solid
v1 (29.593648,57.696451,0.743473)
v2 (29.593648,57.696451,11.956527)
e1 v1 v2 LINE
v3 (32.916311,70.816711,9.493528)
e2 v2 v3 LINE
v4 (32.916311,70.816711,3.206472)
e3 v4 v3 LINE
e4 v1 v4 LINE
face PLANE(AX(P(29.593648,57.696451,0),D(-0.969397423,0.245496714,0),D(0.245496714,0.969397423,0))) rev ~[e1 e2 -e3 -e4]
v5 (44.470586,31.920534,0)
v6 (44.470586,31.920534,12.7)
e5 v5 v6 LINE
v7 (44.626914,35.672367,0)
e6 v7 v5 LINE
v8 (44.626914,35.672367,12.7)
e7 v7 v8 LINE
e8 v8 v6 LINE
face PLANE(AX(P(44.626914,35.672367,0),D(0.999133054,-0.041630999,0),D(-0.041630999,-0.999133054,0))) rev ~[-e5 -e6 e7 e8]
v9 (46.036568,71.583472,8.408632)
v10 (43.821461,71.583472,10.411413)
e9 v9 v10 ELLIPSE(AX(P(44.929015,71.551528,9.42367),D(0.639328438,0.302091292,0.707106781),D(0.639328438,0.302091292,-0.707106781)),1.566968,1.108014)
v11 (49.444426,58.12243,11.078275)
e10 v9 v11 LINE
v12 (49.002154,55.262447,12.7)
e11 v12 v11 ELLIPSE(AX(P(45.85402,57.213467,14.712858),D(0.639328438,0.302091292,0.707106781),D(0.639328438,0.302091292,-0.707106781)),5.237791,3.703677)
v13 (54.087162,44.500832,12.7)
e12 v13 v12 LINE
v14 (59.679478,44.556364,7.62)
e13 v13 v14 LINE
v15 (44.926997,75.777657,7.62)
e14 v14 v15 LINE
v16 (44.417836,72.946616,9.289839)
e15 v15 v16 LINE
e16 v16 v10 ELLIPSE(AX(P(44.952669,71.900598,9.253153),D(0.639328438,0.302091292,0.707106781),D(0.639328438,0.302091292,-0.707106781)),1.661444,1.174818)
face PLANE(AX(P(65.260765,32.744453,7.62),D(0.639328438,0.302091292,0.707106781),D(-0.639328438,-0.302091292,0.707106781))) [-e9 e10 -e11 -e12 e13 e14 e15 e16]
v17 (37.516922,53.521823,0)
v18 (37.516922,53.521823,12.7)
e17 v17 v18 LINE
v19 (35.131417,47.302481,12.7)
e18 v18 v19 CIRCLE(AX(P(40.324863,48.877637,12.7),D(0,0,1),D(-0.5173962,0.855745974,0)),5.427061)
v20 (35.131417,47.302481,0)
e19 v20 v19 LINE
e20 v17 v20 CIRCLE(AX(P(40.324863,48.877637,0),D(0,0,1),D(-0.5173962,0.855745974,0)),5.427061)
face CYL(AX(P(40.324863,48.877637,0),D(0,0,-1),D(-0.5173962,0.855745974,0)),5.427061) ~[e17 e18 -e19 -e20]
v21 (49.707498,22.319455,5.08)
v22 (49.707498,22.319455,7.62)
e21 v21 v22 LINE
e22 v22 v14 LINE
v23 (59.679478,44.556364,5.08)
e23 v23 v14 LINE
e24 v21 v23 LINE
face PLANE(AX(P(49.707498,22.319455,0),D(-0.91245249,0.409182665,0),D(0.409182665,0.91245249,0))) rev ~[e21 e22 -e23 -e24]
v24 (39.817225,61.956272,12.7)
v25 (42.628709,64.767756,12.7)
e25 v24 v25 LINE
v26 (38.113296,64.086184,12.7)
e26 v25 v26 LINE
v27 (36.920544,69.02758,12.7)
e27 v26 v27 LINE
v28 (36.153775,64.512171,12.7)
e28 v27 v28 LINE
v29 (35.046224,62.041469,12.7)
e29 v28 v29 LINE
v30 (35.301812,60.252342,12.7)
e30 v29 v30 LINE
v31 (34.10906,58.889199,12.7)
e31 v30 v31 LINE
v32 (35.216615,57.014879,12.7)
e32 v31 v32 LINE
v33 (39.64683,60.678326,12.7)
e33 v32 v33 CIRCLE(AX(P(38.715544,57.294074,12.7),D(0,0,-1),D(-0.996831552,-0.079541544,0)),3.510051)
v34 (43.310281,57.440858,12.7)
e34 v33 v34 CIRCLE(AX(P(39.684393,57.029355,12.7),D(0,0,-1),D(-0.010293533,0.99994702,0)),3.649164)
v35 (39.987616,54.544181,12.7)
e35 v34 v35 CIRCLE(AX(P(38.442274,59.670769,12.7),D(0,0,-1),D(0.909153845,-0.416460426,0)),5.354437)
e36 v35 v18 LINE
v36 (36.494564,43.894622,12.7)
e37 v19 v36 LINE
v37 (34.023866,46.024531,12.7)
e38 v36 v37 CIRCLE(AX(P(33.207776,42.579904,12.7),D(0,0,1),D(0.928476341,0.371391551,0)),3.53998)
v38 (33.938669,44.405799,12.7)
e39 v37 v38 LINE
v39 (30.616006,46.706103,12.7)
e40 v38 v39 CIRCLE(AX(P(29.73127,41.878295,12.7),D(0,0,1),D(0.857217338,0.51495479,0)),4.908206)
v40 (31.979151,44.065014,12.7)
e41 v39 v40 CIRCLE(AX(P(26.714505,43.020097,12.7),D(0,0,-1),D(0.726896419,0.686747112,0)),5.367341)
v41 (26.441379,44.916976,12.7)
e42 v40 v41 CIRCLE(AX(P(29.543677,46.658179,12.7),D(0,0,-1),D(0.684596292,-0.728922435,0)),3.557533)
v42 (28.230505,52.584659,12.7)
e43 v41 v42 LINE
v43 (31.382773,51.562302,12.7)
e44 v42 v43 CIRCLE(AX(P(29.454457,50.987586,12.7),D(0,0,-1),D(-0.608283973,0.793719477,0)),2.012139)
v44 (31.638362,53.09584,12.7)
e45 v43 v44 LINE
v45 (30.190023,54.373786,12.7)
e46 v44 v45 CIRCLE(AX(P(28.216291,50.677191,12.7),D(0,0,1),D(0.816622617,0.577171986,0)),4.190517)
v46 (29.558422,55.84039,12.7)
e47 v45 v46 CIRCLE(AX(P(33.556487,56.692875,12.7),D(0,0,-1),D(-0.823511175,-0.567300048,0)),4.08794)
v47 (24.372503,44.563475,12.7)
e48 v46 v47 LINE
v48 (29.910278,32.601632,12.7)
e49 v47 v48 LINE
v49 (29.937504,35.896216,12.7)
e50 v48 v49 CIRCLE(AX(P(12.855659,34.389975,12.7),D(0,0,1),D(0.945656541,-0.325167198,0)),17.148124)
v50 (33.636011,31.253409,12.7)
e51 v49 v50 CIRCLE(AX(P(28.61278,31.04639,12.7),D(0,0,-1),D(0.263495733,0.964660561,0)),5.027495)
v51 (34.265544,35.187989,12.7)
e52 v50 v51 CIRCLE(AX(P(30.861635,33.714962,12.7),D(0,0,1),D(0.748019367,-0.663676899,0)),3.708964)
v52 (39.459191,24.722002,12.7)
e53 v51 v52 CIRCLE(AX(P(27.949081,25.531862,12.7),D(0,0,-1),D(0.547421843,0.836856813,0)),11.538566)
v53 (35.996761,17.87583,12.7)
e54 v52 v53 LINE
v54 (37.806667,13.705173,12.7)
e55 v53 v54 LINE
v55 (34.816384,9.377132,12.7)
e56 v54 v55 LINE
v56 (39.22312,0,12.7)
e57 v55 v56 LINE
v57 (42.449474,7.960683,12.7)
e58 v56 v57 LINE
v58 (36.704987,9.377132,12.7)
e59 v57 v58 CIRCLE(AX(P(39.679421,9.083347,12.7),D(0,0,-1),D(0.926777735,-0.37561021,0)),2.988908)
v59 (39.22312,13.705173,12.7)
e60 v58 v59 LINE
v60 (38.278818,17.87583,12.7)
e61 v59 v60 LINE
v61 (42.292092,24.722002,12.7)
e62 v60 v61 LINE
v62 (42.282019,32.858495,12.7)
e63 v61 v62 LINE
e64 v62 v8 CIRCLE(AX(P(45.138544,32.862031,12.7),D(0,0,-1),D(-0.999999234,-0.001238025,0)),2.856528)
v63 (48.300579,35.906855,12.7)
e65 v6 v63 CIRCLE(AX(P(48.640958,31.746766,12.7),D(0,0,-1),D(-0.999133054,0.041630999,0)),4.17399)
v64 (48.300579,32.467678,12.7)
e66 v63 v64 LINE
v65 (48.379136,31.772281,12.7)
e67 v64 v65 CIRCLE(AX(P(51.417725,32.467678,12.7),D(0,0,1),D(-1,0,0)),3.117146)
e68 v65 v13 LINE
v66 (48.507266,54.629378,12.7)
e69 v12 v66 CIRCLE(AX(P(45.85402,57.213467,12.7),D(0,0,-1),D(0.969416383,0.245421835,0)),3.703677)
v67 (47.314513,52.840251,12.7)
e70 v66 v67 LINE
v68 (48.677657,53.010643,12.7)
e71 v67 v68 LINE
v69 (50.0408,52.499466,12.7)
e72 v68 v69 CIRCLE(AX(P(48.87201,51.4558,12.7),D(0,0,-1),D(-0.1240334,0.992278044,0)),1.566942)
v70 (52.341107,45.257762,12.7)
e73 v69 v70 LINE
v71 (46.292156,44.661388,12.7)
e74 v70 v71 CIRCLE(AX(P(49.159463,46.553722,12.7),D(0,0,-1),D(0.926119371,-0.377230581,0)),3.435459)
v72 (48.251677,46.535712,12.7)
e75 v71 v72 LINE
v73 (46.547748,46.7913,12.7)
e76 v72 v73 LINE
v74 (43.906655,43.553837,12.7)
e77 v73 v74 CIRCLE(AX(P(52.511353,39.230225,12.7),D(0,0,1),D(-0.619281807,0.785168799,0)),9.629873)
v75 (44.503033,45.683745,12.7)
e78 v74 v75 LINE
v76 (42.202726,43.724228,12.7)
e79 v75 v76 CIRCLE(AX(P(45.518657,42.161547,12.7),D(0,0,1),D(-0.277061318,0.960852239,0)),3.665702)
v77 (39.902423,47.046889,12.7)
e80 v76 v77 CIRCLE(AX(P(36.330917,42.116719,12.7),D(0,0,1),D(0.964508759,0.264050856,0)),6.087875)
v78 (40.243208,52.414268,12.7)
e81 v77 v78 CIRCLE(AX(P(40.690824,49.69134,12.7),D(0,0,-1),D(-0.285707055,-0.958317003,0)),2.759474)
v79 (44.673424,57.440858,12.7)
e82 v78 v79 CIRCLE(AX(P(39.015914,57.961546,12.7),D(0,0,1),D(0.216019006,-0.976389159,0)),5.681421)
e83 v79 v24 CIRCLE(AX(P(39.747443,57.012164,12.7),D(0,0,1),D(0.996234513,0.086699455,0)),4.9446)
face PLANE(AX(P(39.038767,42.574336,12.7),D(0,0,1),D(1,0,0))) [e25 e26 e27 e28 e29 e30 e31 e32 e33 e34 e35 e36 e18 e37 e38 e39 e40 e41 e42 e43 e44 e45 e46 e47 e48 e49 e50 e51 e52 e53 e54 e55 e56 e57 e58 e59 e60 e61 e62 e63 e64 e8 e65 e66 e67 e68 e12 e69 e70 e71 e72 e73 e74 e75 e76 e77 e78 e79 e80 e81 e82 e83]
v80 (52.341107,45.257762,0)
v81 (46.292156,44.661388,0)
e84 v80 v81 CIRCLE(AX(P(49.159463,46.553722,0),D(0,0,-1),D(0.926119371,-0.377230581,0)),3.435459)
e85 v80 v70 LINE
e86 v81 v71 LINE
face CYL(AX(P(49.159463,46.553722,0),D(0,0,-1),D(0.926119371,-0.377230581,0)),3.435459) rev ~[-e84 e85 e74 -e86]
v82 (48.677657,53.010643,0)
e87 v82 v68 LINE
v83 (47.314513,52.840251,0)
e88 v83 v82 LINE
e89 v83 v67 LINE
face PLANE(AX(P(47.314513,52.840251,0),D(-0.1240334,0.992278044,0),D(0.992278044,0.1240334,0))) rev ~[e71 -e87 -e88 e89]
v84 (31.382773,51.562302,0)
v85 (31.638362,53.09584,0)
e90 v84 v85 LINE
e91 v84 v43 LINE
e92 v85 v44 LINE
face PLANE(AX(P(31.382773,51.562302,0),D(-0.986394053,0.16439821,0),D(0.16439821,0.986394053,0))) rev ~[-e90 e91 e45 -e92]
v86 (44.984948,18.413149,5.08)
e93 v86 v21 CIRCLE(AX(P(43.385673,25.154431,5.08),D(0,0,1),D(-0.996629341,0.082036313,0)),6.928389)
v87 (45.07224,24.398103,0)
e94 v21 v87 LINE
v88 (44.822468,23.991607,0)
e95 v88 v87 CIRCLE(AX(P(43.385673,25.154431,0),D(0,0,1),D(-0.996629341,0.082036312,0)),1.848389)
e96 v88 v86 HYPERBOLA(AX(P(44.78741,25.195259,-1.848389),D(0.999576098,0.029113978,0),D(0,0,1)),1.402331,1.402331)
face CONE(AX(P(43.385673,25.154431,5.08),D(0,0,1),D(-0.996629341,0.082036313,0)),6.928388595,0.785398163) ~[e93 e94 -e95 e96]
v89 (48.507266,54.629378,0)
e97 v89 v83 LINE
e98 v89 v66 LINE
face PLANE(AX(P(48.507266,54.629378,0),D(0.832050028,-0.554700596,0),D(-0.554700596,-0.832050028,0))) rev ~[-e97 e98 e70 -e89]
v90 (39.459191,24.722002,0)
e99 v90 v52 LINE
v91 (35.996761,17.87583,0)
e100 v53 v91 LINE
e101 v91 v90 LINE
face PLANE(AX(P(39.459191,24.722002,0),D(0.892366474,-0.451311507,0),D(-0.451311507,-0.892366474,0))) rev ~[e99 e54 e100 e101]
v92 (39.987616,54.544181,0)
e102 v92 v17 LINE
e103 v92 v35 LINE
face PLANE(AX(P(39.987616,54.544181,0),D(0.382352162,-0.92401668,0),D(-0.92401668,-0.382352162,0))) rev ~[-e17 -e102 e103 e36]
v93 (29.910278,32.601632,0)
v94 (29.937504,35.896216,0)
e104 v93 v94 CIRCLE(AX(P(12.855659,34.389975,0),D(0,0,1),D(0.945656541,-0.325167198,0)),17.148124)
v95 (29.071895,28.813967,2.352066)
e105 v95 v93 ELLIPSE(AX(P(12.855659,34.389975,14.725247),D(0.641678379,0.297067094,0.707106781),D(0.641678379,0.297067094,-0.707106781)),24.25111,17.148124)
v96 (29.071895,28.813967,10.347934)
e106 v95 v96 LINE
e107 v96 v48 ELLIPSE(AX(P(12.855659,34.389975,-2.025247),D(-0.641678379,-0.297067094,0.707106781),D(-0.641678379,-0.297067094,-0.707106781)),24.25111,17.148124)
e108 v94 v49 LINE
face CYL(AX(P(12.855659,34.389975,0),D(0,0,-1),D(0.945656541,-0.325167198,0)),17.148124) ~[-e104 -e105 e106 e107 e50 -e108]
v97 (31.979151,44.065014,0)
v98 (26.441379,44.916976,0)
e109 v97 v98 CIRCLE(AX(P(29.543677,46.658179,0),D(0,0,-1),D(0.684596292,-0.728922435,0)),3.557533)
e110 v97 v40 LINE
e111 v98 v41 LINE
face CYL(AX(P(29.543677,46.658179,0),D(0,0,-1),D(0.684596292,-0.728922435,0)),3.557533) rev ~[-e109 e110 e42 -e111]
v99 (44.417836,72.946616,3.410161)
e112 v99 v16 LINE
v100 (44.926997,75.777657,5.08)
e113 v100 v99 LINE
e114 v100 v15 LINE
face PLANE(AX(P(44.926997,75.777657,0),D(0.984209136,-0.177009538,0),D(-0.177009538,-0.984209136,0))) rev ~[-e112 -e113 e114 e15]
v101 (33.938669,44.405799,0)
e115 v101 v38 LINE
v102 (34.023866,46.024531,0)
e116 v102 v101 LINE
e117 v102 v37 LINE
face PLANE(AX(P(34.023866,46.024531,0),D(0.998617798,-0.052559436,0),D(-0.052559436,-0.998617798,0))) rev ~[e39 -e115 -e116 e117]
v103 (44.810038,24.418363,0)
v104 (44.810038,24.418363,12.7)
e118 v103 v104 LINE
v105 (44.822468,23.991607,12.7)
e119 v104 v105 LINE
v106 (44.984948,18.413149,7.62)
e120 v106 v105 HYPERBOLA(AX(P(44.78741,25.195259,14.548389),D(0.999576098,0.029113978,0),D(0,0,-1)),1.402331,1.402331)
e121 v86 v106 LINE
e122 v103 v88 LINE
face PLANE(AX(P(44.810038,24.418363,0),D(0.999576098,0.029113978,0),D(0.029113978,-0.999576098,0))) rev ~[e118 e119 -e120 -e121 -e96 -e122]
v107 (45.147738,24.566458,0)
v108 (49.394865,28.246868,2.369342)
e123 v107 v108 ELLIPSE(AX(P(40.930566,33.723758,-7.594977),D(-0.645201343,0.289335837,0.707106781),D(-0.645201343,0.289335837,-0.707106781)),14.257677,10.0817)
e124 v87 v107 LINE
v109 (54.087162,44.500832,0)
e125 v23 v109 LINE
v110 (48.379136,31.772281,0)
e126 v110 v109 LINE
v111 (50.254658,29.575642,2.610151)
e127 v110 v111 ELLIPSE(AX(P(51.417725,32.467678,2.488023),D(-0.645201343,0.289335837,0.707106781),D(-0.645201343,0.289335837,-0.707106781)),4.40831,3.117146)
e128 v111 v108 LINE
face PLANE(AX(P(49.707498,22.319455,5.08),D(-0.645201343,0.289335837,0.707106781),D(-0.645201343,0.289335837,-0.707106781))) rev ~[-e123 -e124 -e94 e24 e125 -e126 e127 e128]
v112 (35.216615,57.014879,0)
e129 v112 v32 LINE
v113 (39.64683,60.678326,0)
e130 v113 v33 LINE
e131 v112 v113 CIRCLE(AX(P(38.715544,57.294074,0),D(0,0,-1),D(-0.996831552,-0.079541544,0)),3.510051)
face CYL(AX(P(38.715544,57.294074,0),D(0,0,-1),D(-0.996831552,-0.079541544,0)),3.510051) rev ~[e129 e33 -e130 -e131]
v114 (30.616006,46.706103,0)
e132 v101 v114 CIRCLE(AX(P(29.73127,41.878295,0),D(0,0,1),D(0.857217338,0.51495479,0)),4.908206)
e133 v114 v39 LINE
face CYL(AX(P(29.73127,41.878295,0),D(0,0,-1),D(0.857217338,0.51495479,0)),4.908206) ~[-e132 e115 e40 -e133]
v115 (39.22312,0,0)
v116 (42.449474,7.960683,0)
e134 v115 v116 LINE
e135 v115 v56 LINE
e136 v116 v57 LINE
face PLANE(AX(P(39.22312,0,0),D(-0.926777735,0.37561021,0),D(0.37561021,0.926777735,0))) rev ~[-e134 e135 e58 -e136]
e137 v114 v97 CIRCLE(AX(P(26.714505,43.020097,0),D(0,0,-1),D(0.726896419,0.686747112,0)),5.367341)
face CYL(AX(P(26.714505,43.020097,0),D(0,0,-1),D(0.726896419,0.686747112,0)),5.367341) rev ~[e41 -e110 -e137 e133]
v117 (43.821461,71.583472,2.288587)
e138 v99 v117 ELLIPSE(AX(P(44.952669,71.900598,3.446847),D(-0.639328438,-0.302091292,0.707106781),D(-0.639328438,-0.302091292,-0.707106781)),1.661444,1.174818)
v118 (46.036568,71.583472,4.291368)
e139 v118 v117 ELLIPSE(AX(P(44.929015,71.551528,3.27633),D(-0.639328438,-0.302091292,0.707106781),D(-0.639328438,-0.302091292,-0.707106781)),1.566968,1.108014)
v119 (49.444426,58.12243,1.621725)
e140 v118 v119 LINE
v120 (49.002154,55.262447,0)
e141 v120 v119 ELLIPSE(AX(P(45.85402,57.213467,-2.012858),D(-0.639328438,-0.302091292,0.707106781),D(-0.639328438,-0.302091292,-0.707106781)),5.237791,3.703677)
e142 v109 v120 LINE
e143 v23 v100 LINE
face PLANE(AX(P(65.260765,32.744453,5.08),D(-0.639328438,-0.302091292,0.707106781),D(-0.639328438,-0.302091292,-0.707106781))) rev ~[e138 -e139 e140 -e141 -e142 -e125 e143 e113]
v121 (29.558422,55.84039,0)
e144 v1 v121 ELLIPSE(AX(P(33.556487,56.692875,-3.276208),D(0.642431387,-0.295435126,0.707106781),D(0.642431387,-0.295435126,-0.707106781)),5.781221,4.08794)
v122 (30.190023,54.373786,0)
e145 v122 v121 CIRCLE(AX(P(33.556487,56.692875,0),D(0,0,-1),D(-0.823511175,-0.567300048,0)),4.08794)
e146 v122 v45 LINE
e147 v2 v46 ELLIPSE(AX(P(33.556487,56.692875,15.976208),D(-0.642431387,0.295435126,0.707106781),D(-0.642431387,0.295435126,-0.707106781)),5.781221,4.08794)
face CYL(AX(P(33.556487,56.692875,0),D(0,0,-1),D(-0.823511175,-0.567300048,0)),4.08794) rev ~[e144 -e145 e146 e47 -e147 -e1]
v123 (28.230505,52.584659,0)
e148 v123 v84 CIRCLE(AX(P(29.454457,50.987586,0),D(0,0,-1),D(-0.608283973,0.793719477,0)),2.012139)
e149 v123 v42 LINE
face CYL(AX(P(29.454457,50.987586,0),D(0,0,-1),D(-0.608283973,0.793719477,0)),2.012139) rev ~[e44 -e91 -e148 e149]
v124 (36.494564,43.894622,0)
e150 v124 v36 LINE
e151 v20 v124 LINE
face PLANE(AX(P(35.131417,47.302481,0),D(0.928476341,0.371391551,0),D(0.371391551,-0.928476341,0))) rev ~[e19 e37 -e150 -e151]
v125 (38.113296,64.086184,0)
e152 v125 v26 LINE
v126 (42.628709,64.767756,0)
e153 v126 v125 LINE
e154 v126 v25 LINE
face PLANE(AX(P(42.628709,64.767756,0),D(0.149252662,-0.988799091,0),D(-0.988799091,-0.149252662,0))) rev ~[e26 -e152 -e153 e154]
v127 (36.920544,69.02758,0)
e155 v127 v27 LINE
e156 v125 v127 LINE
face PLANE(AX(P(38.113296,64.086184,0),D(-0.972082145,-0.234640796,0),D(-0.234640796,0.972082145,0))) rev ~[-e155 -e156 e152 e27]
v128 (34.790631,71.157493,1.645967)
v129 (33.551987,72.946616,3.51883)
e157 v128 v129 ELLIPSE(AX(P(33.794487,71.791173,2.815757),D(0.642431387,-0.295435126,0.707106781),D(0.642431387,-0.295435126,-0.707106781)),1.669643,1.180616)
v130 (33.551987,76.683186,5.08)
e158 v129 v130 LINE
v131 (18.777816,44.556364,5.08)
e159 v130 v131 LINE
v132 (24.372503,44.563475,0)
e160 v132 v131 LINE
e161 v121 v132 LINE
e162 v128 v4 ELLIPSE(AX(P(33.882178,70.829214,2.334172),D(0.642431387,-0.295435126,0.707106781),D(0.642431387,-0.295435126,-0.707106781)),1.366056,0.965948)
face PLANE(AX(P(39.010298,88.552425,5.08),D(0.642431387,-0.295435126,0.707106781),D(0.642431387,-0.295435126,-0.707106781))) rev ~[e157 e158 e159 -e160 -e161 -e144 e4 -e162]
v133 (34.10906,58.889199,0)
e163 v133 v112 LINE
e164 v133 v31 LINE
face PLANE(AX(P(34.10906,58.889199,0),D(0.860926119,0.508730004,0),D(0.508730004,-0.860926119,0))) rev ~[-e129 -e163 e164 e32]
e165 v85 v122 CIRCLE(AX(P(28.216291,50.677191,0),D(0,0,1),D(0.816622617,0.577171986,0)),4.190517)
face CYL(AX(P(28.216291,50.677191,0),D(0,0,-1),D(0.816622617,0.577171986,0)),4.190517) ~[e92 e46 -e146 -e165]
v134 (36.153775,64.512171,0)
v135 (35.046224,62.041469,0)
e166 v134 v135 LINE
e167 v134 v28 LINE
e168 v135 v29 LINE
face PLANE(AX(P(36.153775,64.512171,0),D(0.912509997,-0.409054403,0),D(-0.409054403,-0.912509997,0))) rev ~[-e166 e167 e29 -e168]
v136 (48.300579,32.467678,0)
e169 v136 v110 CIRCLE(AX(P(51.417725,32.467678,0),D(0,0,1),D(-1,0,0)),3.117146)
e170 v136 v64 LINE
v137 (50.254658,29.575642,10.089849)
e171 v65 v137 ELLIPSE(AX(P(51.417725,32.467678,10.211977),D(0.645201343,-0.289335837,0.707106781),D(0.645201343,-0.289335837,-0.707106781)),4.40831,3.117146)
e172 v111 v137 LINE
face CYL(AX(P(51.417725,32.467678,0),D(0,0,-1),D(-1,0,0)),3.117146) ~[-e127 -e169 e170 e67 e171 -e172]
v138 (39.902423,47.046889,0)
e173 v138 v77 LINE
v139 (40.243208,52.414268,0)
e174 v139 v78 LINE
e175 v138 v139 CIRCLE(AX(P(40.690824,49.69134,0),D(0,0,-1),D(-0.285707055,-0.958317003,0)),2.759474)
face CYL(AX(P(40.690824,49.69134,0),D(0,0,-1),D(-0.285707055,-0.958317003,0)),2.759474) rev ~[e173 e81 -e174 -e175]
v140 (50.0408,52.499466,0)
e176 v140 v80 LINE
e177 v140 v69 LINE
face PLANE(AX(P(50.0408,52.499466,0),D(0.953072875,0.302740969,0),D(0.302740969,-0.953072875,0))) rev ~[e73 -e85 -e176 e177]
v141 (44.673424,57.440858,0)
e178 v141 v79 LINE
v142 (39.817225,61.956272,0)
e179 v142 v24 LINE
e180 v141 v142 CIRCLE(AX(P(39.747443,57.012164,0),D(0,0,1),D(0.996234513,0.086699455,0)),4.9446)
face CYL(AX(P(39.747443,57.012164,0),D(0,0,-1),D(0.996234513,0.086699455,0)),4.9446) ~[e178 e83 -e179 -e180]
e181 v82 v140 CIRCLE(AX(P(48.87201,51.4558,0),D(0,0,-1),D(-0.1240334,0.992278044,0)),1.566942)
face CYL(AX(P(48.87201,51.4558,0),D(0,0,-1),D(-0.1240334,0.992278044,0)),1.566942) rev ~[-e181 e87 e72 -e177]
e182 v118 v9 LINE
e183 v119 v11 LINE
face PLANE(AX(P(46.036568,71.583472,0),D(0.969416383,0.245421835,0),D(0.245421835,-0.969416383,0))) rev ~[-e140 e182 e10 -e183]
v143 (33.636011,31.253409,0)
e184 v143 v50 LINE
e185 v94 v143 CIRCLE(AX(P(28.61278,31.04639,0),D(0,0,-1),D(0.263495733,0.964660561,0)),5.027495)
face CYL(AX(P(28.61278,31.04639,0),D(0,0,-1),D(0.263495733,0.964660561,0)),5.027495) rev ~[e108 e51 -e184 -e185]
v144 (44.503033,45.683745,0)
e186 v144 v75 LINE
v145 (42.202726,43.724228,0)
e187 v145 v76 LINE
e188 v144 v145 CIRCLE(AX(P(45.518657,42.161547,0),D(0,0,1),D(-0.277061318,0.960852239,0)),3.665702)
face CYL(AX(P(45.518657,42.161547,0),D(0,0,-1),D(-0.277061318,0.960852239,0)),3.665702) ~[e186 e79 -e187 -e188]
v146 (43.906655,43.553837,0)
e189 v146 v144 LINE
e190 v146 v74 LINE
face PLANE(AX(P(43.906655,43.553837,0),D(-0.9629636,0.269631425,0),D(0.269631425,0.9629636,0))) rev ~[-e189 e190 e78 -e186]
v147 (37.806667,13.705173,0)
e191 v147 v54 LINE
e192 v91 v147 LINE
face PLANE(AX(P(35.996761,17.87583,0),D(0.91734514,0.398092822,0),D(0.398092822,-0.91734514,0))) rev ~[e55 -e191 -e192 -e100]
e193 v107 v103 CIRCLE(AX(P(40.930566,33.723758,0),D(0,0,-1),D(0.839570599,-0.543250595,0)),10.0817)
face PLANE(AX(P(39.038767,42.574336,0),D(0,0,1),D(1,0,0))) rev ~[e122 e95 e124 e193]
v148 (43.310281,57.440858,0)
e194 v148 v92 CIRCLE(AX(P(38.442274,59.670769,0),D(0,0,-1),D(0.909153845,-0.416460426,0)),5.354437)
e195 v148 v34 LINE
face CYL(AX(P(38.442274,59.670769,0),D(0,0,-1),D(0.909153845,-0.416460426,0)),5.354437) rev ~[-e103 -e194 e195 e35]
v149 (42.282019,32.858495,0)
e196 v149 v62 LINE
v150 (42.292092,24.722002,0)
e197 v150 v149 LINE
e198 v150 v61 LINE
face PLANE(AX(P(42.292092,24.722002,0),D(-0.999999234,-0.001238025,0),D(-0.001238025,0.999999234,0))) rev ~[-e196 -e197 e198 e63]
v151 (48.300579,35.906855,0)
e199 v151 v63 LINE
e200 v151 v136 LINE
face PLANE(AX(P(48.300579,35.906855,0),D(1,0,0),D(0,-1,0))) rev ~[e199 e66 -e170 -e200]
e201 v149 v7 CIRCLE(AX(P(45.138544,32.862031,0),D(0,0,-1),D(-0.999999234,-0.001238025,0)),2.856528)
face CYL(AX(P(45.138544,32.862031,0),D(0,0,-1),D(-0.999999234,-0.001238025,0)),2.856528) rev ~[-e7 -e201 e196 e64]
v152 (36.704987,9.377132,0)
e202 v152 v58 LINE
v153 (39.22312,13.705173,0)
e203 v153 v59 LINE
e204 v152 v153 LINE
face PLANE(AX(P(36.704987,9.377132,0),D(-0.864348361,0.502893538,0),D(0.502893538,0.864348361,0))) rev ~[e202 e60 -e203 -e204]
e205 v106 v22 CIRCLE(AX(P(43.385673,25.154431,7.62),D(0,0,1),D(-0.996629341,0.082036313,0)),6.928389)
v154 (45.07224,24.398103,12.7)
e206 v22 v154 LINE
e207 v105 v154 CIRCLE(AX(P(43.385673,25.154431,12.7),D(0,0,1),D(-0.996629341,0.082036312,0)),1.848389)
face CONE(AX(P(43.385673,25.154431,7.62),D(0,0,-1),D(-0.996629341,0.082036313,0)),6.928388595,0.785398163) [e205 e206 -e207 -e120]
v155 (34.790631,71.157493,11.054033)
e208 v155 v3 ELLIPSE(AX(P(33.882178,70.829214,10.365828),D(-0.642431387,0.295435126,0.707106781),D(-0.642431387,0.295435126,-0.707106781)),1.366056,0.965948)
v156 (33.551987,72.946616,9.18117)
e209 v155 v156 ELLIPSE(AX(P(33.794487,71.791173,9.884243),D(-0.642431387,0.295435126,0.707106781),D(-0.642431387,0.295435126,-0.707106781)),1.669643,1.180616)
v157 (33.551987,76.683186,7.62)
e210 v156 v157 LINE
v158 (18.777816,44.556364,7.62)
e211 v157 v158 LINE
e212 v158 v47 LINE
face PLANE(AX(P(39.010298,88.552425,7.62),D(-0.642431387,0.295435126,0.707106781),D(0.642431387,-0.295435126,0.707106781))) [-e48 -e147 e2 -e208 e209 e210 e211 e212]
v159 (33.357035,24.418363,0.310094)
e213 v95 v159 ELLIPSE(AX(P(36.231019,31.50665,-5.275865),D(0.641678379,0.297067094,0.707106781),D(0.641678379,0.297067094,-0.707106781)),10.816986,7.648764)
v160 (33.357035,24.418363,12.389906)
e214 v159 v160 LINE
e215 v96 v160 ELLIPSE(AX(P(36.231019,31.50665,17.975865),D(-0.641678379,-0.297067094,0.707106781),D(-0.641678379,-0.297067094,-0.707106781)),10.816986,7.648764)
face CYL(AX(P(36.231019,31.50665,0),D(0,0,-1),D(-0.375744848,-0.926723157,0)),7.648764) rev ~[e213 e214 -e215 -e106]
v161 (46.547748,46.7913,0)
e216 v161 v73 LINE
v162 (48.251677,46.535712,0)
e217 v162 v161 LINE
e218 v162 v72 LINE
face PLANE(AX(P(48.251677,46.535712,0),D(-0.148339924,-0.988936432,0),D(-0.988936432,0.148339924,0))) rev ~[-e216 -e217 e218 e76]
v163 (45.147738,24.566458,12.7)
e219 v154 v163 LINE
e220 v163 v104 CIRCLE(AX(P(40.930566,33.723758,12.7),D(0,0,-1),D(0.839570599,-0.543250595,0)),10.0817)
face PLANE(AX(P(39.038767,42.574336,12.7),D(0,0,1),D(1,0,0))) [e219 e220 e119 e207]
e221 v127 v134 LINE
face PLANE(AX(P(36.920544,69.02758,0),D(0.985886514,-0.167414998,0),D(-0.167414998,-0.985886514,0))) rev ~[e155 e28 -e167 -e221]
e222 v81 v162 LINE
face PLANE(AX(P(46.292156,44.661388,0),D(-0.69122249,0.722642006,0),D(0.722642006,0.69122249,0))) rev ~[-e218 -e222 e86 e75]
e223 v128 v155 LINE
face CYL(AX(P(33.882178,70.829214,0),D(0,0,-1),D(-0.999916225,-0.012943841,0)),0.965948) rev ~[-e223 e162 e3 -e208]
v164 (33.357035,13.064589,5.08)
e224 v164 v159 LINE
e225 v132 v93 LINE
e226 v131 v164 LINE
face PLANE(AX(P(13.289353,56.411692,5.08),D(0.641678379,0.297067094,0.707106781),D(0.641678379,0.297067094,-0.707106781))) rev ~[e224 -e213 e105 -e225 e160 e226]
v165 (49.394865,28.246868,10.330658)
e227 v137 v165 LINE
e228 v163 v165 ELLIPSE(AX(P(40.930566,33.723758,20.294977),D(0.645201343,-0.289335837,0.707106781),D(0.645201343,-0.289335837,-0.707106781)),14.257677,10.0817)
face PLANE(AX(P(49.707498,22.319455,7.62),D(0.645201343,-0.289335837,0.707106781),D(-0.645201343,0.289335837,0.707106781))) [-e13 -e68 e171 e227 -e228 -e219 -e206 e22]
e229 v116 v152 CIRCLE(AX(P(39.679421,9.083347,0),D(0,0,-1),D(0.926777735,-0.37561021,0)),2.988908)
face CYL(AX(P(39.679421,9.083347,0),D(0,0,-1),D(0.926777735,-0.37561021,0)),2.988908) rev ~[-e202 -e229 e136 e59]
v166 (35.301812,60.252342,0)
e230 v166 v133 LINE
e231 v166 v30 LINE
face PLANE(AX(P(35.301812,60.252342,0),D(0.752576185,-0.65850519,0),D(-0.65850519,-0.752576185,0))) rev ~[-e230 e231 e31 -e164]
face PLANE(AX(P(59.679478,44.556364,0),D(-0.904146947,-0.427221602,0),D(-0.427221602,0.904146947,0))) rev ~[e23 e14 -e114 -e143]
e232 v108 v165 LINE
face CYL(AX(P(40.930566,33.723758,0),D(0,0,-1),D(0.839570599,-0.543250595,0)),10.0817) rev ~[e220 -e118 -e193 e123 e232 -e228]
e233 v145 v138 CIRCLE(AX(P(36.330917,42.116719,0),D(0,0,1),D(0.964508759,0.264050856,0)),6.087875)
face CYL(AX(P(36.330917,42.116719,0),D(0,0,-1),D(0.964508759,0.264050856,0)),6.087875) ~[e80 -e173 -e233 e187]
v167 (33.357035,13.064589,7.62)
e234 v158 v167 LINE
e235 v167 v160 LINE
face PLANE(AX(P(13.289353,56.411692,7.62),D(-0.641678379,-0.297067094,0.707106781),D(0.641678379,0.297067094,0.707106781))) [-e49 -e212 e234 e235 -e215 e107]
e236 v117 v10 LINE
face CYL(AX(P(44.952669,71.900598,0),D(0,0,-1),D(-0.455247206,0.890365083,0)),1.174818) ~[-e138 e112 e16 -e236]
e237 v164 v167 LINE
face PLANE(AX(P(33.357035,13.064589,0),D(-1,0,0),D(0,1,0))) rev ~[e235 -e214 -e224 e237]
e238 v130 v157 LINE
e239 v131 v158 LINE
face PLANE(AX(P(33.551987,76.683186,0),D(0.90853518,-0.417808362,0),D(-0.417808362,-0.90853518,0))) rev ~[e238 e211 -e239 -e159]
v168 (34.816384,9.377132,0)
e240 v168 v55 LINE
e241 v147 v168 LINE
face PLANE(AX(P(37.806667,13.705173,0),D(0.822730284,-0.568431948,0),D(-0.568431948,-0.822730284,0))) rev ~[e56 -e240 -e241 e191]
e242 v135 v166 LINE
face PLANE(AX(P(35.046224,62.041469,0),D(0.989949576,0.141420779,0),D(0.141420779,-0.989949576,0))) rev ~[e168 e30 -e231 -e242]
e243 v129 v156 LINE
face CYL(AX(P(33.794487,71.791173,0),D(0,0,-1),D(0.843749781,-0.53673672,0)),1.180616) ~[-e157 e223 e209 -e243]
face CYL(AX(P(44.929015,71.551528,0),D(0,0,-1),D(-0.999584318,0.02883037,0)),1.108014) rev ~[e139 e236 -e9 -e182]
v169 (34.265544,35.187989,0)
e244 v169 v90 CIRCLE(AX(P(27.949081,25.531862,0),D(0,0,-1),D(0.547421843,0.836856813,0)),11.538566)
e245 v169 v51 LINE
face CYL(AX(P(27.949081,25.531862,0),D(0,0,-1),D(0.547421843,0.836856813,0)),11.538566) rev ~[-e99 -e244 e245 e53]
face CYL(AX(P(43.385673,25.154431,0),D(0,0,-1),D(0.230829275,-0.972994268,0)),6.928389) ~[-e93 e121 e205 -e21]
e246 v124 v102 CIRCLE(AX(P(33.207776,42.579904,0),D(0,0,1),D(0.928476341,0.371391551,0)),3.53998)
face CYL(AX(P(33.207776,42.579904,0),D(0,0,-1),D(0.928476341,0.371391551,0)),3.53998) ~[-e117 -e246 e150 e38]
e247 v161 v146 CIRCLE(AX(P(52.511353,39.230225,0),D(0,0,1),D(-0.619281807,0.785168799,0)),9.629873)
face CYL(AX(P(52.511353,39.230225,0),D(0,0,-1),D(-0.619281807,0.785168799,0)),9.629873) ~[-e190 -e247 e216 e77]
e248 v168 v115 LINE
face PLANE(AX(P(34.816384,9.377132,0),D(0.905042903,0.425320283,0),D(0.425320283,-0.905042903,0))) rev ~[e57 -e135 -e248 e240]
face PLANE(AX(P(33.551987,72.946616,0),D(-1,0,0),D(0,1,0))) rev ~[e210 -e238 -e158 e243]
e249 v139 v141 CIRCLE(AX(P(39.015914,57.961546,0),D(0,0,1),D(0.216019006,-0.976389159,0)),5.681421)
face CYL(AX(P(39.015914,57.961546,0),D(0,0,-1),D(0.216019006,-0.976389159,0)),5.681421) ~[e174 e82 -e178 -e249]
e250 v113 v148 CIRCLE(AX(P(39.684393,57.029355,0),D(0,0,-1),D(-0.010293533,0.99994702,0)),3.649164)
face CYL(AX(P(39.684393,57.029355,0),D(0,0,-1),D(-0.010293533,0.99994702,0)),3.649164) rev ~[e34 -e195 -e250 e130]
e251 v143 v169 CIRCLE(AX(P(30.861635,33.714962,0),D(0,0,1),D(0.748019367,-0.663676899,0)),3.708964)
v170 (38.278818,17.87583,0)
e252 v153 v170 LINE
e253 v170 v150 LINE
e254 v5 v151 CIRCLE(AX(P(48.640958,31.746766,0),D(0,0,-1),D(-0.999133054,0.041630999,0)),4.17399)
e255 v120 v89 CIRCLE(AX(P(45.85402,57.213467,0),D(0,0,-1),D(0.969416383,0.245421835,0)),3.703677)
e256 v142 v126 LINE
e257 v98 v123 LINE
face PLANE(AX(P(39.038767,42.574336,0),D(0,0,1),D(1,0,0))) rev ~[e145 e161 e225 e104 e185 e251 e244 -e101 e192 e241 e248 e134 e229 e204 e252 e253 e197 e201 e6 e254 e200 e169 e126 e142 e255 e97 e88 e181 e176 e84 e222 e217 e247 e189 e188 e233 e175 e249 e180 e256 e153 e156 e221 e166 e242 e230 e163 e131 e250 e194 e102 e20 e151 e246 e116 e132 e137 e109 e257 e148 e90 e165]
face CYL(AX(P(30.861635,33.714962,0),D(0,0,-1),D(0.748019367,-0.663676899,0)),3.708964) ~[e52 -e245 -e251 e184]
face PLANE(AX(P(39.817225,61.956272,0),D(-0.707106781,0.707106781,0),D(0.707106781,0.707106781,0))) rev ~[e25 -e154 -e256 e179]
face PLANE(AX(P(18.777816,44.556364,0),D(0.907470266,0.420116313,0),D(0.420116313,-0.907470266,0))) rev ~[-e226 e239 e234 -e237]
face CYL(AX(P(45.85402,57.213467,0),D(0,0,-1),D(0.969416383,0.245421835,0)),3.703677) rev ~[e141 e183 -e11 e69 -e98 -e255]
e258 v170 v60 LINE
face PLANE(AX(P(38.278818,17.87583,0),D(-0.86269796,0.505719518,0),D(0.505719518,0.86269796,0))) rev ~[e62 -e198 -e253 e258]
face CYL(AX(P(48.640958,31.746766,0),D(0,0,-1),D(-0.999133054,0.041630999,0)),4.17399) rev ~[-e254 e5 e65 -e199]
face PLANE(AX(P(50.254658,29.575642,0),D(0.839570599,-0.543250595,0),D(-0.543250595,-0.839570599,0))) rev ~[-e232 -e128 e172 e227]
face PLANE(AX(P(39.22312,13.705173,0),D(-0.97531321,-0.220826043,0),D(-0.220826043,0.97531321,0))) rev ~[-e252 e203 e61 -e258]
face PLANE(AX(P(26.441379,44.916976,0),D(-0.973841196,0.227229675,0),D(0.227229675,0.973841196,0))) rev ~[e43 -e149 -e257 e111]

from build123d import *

# Parameters (mm, degrees)
F1_DEPTH     = 12.7
F2_T1_DEPTH  = 61.4894192219
F2_T3_DEPTH  = 60.6595144669
F2_T5_DEPTH  = 37.4346345762
F2_T10_DEPTH = 60.8311166964
F2_T15_ANGLE = 160.5521212616
F2_T20_DEPTH = 60.8311166964
F2_T25_ANGLE = 160.5521212616


# Not quite as in the source:
# - a fillet or chamfer that OpenCascade refuses, or shapes differently, is made with other operations: its cross-section is extruded or revolved along the edge and cut away or added


with BuildPart() as f1:
    # F0 (on Top) → F1 (new body)
    with BuildSketch(Plane.XY):
        with BuildLine():
            Line((38.2788181305, 17.8758297116), (42.2920919955, 24.7220024467))
            Line((42.2920919955, 24.7220024467), (42.2820188105, 32.8584946692))
            ThreePointArc((42.2820188105, 32.8584946692), (42.9440997072, 34.690736549), (44.6269139647, 35.6723666191))
            Line((44.6269139647, 35.6723666191), (44.4705858827, 31.9205336273))
            ThreePointArc((44.4705858827, 31.9205336273), (45.6310728705, 34.6386150419), (48.3005791903, 35.9068550169))
            Line((48.3005791903, 35.9068550169), (48.3005791903, 32.4676781893))
            ThreePointArc((48.3005791903, 32.4676781893), (48.8348924642, 30.7225209157), (50.2546578646, 29.5756421983))
            Line((50.2546578646, 29.5756421983), (49.394864589, 28.2468684018))
            ThreePointArc((49.394864589, 28.2468684018), (47.3924953639, 25.9852736124), (44.8100380599, 24.4183633476))
            Line((44.8100380599, 24.4183633476), (44.98494789, 18.4131488204))
            ThreePointArc((44.98494789, 18.4131488204), (47.8016399203, 19.8157230834), (49.7074984014, 22.3194546998))
            Line((49.7074984014, 22.3194546998), (59.6794784069, 44.5563644171))
            Line((59.6794784069, 44.5563644171), (44.9269972742, 75.77765733))
            Line((44.9269972742, 75.77765733), (44.417835772, 72.9466155171))
            ThreePointArc((44.417835772, 72.9466155171), (43.8763497816, 72.371486937), (43.8214614987, 71.5834721923))
            ThreePointArc((43.8214614987, 71.5834721923), (44.9290145189, 72.6595413512), (46.036567539, 71.5834721923))
            Line((46.036567539, 71.5834721923), (49.4444258511, 58.1224299967))
            ThreePointArc((49.4444258511, 58.1224299967), (49.4311906391, 56.2537383436), (48.5072657466, 54.6293780208))
            Line((48.5072657466, 54.6293780208), (47.3145134747, 52.8402514756))
            Line((47.3145134747, 52.8402514756), (48.6776567996, 53.0106425285))
            ThreePointArc((48.6776567996, 53.0106425285), (49.4221984033, 52.9229745419), (50.0408001244, 52.4994656444))
            Line((50.0408001244, 52.4994656444), (52.3411072791, 45.2577620745))
            ThreePointArc((52.3411072791, 45.2577620745), (49.496534757, 43.1348395296), (46.2921559811, 44.6613878012))
            Line((46.2921559811, 44.6613878012), (48.2516773045, 46.5357117355))
            Line((48.2516773045, 46.5357117355), (46.5477481484, 46.7913001776))
            ThreePointArc((46.5477481484, 46.7913001776), (45.0495064909, 45.3175304922), (43.9066551626, 43.5538366437))
            Line((43.9066551626, 43.5538366437), (44.5030331612, 45.6837452948))
            ThreePointArc((44.5030331612, 45.6837452948), (43.1415749719, 44.952040155), (42.2027260065, 43.7242276967))
            ThreePointArc((42.2027260065, 43.7242276967), (41.3363207449, 45.5819979858), (39.9024225771, 47.0468886197))
            ThreePointArc((39.9024225771, 47.0468886197), (37.9368947907, 49.8661923797), (40.2432084084, 52.4142682552))
            ThreePointArc((40.2432084084, 52.4142682552), (43.2781651475, 54.2049845256), (44.6734242141, 57.4408583343))
            ThreePointArc((44.6734242141, 57.4408583343), (43.1144375969, 60.6332712401), (39.817225188, 61.9562715292))
            Line((39.817225188, 61.9562715292), (42.6287092268, 64.767755568))
            Line((42.6287092268, 64.767755568), (38.113296032, 64.0861839056))
            Line((38.113296032, 64.0861839056), (36.9205437601, 69.0275803208))
            Line((36.9205437601, 69.0275803208), (36.1537747085, 64.5121708512))
            Line((36.1537747085, 64.5121708512), (35.046223551, 62.0414689183))
            Line((35.046223551, 62.0414689183), (35.3018119931, 60.2523423731))
            Line((35.3018119931, 60.2523423731), (34.1090597212, 58.8891990483))
            Line((34.1090597212, 58.8891990483), (35.216614604, 57.0148788393))
            ThreePointArc((35.216614604, 57.0148788393), (36.4787140011, 59.9990779117), (39.6468304098, 60.6783255935))
            ThreePointArc((39.6468304098, 60.6783255935), (42.100861171, 59.7637799228), (43.3102808893, 57.4408583343))
            ThreePointArc((43.3102808893, 57.4408583343), (41.960859951, 55.6347382447), (39.987616241, 54.5441806316))
            Line((39.987616241, 54.5441806316), (37.5169217587, 53.521823138))
            ThreePointArc((37.5169217587, 53.521823138), (35.2577529504, 50.8211890197), (35.1314172149, 47.302480787))
            Line((35.1314172149, 47.302480787), (36.494564265, 43.8946224749))
            ThreePointArc((36.494564265, 43.8946224749), (35.5191674638, 45.2611219807), (34.0238660574, 46.024531126))
            Line((34.0238660574, 46.024531126), (33.9386686683, 44.4057993591))
            ThreePointArc((33.9386686683, 44.4057993591), (32.5250680188, 45.9137846149), (30.6160058826, 46.7061027884))
            ThreePointArc((30.6160058826, 46.7061027884), (31.4840333326, 45.4817930881), (31.9791510701, 44.0650135279))
            ThreePointArc((31.9791510701, 44.0650135279), (29.0027298162, 43.1420138964), (26.4413785189, 44.9169762433))
            Line((26.4413785189, 44.9169762433), (28.2305050641, 52.5846593082))
            ThreePointArc((28.2305050641, 52.5846593082), (30.0752112346, 52.9015778311), (31.3827730715, 51.5623018146))
            Line((31.3827730715, 51.5623018146), (31.6383615136, 53.0958399177))
            ThreePointArc((31.6383615136, 53.0958399177), (30.9888271445, 53.8193992901), (30.1900226623, 54.3737858534))
            ThreePointArc((30.1900226623, 54.3737858534), (29.5328449453, 55.9706841256), (29.593648389, 57.6964505017))
            Line((29.593648389, 57.6964505017), (32.9163111746, 70.8167105913))
            ThreePointArc((32.9163111746, 70.8167105913), (33.7093855935, 71.7795807909), (34.7906313837, 71.1574926972))
            ThreePointArc((34.7906313837, 71.1574926972), (34.7651749092, 72.4631986698), (33.5519872606, 72.9466155171))
            Line((33.5519872606, 72.9466155171), (33.5519872606, 76.6831859946))
            Line((33.5519872606, 76.6831859946), (18.7778156251, 44.5563644171))
            Line((18.7778156251, 44.5563644171), (33.3570353687, 13.0645893514))
            Line((33.3570353687, 13.0645893514), (33.3570353687, 24.4183633476))
            ThreePointArc((33.3570353687, 24.4183633476), (30.754145435, 26.167413579), (29.0718954057, 28.8139674813))
            ThreePointArc((29.0718954057, 28.8139674813), (29.8771193905, 32.3095735456), (29.9375038594, 35.8962155879))
            ThreePointArc((29.9375038594, 35.8962155879), (32.545088234, 34.1789060872), (33.6360111833, 31.2534086406))
            ThreePointArc((33.6360111833, 31.2534086406), (34.5240159071, 33.128980926), (34.2655442655, 35.1879894733))
            ThreePointArc((34.2655442655, 35.1879894733), (38.2849845666, 30.6609560826), (39.4591912627, 24.7220024467))
            Line((39.4591912627, 24.7220024467), (35.996761173, 17.8758297116))
            Line((35.996761173, 17.8758297116), (37.8066673875, 13.705172576))
            Line((37.8066673875, 13.705172576), (34.8163843155, 9.3771321699))
            Line((34.8163843155, 9.3771321699), (39.2231196165, 0))
            Line((39.2231196165, 0), (42.4494743347, 7.9606827348))
            ThreePointArc((42.4494743347, 7.9606827348), (38.9638620653, 6.181357436), (36.7049872875, 9.3771321699))
            Line((36.7049872875, 9.3771321699), (39.2231196165, 13.705172576))
            Line((39.2231196165, 13.705172576), (38.2788181305, 17.8758297116))
        make_face()
    extrude(amount=F1_DEPTH)

    # F2: chamfer of 5.08 on 10 edges, made by hand

    # F2_s2 → F2_t1 (cut)
    with BuildSketch(Plane(origin=(40.423720467, 87.9024345312, 0), x_dir=(0, 0, 1), z_dir=(-0.4178083615, -0.9085351799, 0))):
        Polygon((7.62, 1.5557155161), (12.7, -3.5242844839), (12.7, 1.5557155161), align=None)
        Polygon((5.08, 1.5557155161), (0, -3.5242844839), (0, 1.5557155161), align=None)
    extrude(amount=F2_T1_DEPTH, mode=Mode.SUBTRACT)

    # F2_s4 → F2_t3 (cut)
    with BuildSketch(Plane(origin=(-0.736952526, 1.5596434572, 0), x_dir=(0, 0, 1), z_dir=(-0.4272216023, 0.9041469474, 0))):
        Polygon((7.62, 72.9944596236), (12.7, 67.9144596236), (12.7, 72.9944596236), align=None)
        Polygon((5.08, 72.9944596236), (0, 67.9144596236), (0, 72.9944596236), align=None)
    extrude(amount=F2_T3_DEPTH, mode=Mode.SUBTRACT)

    # F2_s6 → F2_t5 (cut)
    with BuildSketch(Plane(origin=(16.6557348467, 37.141277044, 0), x_dir=(0, 0, 1), z_dir=(0.4091826653, 0.91245249, 0))):
        Polygon((7.62, 36.2229967242), (12.7, 31.1429967242), (12.7, 36.2229967242), align=None)
        Polygon((5.08, 36.2229967242), (0, 31.1429967242), (0, 36.2229967242), align=None)
    extrude(amount=F2_T5_DEPTH, mode=Mode.SUBTRACT)


with BuildPart() as f2_tool8:
    # F2_s9 → F2_t10 (new body)
    with BuildSketch(Plane(origin=(-19.1610255807, 41.3886832236, 0), x_dir=(0, 0, 1), z_dir=(0.4201163127, -0.9074702661, 0))):
        Polygon((7.62, -35.7591648667), (12.7, -40.8391648667), (12.7, -35.7591648667), align=None)
    extrude(amount=F2_T10_DEPTH)

    split(bisect_by=Plane(origin=(21.465639244, -10.8561787862, 0), x_dir=(0, 0, 1), z_dir=(-0.8923664741, 0.4513115065, 0)), keep=Keep.TOP)


with BuildPart() as f1_1:
    add(f1.part)

    # F2_t7: cut F2_tool8
    add(f2_tool8.part, mode=Mode.SUBTRACT)


with BuildPart() as f2_tool13:
    # F2_s14 → F2_t15 (revolve)
    with BuildSketch(Plane(origin=(2.3486048787, 28.532346778, 0), x_dir=(0, 0, 1), z_dir=(0.0820363131, 0.996629341, 0))):
        Polygon((7.62, 34.2474692794), (12.7, 39.3274692794), (12.7, 34.2474692794), align=None)
    revolve(axis=Axis((43.3856729768, 25.154431211, 12.7), (0, 0, 1)), revolution_arc=F2_T15_ANGLE)

    split(bisect_by=Plane(origin=(45.4826703508, 1.3247430391, 0), x_dir=(0, 0, 1), z_dir=(0.9995760983, 0.0291139783, 0)), keep=Keep.TOP)


with BuildPart() as f1_2:
    add(f1_1.part)

    # F2_t12: cut F2_tool13
    add(f2_tool13.part, mode=Mode.SUBTRACT)


with BuildPart() as f2_tool18:
    # F2_s19 → F2_t20 (new body)
    with BuildSketch(Plane(origin=(-19.1610255807, 41.3886832236, 0), x_dir=(0, 0, 1), z_dir=(0.4201163127, -0.9074702661, 0))):
        Polygon((5.08, -35.7591648667), (0, -40.8391648667), (0, -35.7591648667), align=None)
    extrude(amount=F2_T20_DEPTH)

    split(bisect_by=Plane(origin=(21.465639244, -10.8561787862, 0), x_dir=(0, 0, 1), z_dir=(-0.8923664741, 0.4513115065, 0)), keep=Keep.TOP)


with BuildPart() as f1_3:
    add(f1_2.part)

    # F2_t17: cut F2_tool18
    add(f2_tool18.part, mode=Mode.SUBTRACT)


with BuildPart() as f2_tool23:
    # F2_s24 → F2_t25 (revolve)
    with BuildSketch(Plane(origin=(2.3486048787, 28.532346778, 0), x_dir=(0, 0, 1), z_dir=(0.0820363131, 0.996629341, 0))):
        Polygon((5.08, 34.2474692794), (0, 39.3274692794), (0, 34.2474692794), align=None)
    revolve(axis=Axis((43.3856729768, 25.154431211, 0), (0, 0, 1)), revolution_arc=F2_T25_ANGLE)

    split(bisect_by=Plane(origin=(45.4826703508, 1.3247430391, 0), x_dir=(0, 0, 1), z_dir=(0.9995760983, 0.0291139783, 0)), keep=Keep.TOP)


with BuildPart() as f1_4:
    add(f1_3.part)

    # F2_t22: cut F2_tool23
    add(f2_tool23.part, mode=Mode.SUBTRACT)


solid = f1_4.part
